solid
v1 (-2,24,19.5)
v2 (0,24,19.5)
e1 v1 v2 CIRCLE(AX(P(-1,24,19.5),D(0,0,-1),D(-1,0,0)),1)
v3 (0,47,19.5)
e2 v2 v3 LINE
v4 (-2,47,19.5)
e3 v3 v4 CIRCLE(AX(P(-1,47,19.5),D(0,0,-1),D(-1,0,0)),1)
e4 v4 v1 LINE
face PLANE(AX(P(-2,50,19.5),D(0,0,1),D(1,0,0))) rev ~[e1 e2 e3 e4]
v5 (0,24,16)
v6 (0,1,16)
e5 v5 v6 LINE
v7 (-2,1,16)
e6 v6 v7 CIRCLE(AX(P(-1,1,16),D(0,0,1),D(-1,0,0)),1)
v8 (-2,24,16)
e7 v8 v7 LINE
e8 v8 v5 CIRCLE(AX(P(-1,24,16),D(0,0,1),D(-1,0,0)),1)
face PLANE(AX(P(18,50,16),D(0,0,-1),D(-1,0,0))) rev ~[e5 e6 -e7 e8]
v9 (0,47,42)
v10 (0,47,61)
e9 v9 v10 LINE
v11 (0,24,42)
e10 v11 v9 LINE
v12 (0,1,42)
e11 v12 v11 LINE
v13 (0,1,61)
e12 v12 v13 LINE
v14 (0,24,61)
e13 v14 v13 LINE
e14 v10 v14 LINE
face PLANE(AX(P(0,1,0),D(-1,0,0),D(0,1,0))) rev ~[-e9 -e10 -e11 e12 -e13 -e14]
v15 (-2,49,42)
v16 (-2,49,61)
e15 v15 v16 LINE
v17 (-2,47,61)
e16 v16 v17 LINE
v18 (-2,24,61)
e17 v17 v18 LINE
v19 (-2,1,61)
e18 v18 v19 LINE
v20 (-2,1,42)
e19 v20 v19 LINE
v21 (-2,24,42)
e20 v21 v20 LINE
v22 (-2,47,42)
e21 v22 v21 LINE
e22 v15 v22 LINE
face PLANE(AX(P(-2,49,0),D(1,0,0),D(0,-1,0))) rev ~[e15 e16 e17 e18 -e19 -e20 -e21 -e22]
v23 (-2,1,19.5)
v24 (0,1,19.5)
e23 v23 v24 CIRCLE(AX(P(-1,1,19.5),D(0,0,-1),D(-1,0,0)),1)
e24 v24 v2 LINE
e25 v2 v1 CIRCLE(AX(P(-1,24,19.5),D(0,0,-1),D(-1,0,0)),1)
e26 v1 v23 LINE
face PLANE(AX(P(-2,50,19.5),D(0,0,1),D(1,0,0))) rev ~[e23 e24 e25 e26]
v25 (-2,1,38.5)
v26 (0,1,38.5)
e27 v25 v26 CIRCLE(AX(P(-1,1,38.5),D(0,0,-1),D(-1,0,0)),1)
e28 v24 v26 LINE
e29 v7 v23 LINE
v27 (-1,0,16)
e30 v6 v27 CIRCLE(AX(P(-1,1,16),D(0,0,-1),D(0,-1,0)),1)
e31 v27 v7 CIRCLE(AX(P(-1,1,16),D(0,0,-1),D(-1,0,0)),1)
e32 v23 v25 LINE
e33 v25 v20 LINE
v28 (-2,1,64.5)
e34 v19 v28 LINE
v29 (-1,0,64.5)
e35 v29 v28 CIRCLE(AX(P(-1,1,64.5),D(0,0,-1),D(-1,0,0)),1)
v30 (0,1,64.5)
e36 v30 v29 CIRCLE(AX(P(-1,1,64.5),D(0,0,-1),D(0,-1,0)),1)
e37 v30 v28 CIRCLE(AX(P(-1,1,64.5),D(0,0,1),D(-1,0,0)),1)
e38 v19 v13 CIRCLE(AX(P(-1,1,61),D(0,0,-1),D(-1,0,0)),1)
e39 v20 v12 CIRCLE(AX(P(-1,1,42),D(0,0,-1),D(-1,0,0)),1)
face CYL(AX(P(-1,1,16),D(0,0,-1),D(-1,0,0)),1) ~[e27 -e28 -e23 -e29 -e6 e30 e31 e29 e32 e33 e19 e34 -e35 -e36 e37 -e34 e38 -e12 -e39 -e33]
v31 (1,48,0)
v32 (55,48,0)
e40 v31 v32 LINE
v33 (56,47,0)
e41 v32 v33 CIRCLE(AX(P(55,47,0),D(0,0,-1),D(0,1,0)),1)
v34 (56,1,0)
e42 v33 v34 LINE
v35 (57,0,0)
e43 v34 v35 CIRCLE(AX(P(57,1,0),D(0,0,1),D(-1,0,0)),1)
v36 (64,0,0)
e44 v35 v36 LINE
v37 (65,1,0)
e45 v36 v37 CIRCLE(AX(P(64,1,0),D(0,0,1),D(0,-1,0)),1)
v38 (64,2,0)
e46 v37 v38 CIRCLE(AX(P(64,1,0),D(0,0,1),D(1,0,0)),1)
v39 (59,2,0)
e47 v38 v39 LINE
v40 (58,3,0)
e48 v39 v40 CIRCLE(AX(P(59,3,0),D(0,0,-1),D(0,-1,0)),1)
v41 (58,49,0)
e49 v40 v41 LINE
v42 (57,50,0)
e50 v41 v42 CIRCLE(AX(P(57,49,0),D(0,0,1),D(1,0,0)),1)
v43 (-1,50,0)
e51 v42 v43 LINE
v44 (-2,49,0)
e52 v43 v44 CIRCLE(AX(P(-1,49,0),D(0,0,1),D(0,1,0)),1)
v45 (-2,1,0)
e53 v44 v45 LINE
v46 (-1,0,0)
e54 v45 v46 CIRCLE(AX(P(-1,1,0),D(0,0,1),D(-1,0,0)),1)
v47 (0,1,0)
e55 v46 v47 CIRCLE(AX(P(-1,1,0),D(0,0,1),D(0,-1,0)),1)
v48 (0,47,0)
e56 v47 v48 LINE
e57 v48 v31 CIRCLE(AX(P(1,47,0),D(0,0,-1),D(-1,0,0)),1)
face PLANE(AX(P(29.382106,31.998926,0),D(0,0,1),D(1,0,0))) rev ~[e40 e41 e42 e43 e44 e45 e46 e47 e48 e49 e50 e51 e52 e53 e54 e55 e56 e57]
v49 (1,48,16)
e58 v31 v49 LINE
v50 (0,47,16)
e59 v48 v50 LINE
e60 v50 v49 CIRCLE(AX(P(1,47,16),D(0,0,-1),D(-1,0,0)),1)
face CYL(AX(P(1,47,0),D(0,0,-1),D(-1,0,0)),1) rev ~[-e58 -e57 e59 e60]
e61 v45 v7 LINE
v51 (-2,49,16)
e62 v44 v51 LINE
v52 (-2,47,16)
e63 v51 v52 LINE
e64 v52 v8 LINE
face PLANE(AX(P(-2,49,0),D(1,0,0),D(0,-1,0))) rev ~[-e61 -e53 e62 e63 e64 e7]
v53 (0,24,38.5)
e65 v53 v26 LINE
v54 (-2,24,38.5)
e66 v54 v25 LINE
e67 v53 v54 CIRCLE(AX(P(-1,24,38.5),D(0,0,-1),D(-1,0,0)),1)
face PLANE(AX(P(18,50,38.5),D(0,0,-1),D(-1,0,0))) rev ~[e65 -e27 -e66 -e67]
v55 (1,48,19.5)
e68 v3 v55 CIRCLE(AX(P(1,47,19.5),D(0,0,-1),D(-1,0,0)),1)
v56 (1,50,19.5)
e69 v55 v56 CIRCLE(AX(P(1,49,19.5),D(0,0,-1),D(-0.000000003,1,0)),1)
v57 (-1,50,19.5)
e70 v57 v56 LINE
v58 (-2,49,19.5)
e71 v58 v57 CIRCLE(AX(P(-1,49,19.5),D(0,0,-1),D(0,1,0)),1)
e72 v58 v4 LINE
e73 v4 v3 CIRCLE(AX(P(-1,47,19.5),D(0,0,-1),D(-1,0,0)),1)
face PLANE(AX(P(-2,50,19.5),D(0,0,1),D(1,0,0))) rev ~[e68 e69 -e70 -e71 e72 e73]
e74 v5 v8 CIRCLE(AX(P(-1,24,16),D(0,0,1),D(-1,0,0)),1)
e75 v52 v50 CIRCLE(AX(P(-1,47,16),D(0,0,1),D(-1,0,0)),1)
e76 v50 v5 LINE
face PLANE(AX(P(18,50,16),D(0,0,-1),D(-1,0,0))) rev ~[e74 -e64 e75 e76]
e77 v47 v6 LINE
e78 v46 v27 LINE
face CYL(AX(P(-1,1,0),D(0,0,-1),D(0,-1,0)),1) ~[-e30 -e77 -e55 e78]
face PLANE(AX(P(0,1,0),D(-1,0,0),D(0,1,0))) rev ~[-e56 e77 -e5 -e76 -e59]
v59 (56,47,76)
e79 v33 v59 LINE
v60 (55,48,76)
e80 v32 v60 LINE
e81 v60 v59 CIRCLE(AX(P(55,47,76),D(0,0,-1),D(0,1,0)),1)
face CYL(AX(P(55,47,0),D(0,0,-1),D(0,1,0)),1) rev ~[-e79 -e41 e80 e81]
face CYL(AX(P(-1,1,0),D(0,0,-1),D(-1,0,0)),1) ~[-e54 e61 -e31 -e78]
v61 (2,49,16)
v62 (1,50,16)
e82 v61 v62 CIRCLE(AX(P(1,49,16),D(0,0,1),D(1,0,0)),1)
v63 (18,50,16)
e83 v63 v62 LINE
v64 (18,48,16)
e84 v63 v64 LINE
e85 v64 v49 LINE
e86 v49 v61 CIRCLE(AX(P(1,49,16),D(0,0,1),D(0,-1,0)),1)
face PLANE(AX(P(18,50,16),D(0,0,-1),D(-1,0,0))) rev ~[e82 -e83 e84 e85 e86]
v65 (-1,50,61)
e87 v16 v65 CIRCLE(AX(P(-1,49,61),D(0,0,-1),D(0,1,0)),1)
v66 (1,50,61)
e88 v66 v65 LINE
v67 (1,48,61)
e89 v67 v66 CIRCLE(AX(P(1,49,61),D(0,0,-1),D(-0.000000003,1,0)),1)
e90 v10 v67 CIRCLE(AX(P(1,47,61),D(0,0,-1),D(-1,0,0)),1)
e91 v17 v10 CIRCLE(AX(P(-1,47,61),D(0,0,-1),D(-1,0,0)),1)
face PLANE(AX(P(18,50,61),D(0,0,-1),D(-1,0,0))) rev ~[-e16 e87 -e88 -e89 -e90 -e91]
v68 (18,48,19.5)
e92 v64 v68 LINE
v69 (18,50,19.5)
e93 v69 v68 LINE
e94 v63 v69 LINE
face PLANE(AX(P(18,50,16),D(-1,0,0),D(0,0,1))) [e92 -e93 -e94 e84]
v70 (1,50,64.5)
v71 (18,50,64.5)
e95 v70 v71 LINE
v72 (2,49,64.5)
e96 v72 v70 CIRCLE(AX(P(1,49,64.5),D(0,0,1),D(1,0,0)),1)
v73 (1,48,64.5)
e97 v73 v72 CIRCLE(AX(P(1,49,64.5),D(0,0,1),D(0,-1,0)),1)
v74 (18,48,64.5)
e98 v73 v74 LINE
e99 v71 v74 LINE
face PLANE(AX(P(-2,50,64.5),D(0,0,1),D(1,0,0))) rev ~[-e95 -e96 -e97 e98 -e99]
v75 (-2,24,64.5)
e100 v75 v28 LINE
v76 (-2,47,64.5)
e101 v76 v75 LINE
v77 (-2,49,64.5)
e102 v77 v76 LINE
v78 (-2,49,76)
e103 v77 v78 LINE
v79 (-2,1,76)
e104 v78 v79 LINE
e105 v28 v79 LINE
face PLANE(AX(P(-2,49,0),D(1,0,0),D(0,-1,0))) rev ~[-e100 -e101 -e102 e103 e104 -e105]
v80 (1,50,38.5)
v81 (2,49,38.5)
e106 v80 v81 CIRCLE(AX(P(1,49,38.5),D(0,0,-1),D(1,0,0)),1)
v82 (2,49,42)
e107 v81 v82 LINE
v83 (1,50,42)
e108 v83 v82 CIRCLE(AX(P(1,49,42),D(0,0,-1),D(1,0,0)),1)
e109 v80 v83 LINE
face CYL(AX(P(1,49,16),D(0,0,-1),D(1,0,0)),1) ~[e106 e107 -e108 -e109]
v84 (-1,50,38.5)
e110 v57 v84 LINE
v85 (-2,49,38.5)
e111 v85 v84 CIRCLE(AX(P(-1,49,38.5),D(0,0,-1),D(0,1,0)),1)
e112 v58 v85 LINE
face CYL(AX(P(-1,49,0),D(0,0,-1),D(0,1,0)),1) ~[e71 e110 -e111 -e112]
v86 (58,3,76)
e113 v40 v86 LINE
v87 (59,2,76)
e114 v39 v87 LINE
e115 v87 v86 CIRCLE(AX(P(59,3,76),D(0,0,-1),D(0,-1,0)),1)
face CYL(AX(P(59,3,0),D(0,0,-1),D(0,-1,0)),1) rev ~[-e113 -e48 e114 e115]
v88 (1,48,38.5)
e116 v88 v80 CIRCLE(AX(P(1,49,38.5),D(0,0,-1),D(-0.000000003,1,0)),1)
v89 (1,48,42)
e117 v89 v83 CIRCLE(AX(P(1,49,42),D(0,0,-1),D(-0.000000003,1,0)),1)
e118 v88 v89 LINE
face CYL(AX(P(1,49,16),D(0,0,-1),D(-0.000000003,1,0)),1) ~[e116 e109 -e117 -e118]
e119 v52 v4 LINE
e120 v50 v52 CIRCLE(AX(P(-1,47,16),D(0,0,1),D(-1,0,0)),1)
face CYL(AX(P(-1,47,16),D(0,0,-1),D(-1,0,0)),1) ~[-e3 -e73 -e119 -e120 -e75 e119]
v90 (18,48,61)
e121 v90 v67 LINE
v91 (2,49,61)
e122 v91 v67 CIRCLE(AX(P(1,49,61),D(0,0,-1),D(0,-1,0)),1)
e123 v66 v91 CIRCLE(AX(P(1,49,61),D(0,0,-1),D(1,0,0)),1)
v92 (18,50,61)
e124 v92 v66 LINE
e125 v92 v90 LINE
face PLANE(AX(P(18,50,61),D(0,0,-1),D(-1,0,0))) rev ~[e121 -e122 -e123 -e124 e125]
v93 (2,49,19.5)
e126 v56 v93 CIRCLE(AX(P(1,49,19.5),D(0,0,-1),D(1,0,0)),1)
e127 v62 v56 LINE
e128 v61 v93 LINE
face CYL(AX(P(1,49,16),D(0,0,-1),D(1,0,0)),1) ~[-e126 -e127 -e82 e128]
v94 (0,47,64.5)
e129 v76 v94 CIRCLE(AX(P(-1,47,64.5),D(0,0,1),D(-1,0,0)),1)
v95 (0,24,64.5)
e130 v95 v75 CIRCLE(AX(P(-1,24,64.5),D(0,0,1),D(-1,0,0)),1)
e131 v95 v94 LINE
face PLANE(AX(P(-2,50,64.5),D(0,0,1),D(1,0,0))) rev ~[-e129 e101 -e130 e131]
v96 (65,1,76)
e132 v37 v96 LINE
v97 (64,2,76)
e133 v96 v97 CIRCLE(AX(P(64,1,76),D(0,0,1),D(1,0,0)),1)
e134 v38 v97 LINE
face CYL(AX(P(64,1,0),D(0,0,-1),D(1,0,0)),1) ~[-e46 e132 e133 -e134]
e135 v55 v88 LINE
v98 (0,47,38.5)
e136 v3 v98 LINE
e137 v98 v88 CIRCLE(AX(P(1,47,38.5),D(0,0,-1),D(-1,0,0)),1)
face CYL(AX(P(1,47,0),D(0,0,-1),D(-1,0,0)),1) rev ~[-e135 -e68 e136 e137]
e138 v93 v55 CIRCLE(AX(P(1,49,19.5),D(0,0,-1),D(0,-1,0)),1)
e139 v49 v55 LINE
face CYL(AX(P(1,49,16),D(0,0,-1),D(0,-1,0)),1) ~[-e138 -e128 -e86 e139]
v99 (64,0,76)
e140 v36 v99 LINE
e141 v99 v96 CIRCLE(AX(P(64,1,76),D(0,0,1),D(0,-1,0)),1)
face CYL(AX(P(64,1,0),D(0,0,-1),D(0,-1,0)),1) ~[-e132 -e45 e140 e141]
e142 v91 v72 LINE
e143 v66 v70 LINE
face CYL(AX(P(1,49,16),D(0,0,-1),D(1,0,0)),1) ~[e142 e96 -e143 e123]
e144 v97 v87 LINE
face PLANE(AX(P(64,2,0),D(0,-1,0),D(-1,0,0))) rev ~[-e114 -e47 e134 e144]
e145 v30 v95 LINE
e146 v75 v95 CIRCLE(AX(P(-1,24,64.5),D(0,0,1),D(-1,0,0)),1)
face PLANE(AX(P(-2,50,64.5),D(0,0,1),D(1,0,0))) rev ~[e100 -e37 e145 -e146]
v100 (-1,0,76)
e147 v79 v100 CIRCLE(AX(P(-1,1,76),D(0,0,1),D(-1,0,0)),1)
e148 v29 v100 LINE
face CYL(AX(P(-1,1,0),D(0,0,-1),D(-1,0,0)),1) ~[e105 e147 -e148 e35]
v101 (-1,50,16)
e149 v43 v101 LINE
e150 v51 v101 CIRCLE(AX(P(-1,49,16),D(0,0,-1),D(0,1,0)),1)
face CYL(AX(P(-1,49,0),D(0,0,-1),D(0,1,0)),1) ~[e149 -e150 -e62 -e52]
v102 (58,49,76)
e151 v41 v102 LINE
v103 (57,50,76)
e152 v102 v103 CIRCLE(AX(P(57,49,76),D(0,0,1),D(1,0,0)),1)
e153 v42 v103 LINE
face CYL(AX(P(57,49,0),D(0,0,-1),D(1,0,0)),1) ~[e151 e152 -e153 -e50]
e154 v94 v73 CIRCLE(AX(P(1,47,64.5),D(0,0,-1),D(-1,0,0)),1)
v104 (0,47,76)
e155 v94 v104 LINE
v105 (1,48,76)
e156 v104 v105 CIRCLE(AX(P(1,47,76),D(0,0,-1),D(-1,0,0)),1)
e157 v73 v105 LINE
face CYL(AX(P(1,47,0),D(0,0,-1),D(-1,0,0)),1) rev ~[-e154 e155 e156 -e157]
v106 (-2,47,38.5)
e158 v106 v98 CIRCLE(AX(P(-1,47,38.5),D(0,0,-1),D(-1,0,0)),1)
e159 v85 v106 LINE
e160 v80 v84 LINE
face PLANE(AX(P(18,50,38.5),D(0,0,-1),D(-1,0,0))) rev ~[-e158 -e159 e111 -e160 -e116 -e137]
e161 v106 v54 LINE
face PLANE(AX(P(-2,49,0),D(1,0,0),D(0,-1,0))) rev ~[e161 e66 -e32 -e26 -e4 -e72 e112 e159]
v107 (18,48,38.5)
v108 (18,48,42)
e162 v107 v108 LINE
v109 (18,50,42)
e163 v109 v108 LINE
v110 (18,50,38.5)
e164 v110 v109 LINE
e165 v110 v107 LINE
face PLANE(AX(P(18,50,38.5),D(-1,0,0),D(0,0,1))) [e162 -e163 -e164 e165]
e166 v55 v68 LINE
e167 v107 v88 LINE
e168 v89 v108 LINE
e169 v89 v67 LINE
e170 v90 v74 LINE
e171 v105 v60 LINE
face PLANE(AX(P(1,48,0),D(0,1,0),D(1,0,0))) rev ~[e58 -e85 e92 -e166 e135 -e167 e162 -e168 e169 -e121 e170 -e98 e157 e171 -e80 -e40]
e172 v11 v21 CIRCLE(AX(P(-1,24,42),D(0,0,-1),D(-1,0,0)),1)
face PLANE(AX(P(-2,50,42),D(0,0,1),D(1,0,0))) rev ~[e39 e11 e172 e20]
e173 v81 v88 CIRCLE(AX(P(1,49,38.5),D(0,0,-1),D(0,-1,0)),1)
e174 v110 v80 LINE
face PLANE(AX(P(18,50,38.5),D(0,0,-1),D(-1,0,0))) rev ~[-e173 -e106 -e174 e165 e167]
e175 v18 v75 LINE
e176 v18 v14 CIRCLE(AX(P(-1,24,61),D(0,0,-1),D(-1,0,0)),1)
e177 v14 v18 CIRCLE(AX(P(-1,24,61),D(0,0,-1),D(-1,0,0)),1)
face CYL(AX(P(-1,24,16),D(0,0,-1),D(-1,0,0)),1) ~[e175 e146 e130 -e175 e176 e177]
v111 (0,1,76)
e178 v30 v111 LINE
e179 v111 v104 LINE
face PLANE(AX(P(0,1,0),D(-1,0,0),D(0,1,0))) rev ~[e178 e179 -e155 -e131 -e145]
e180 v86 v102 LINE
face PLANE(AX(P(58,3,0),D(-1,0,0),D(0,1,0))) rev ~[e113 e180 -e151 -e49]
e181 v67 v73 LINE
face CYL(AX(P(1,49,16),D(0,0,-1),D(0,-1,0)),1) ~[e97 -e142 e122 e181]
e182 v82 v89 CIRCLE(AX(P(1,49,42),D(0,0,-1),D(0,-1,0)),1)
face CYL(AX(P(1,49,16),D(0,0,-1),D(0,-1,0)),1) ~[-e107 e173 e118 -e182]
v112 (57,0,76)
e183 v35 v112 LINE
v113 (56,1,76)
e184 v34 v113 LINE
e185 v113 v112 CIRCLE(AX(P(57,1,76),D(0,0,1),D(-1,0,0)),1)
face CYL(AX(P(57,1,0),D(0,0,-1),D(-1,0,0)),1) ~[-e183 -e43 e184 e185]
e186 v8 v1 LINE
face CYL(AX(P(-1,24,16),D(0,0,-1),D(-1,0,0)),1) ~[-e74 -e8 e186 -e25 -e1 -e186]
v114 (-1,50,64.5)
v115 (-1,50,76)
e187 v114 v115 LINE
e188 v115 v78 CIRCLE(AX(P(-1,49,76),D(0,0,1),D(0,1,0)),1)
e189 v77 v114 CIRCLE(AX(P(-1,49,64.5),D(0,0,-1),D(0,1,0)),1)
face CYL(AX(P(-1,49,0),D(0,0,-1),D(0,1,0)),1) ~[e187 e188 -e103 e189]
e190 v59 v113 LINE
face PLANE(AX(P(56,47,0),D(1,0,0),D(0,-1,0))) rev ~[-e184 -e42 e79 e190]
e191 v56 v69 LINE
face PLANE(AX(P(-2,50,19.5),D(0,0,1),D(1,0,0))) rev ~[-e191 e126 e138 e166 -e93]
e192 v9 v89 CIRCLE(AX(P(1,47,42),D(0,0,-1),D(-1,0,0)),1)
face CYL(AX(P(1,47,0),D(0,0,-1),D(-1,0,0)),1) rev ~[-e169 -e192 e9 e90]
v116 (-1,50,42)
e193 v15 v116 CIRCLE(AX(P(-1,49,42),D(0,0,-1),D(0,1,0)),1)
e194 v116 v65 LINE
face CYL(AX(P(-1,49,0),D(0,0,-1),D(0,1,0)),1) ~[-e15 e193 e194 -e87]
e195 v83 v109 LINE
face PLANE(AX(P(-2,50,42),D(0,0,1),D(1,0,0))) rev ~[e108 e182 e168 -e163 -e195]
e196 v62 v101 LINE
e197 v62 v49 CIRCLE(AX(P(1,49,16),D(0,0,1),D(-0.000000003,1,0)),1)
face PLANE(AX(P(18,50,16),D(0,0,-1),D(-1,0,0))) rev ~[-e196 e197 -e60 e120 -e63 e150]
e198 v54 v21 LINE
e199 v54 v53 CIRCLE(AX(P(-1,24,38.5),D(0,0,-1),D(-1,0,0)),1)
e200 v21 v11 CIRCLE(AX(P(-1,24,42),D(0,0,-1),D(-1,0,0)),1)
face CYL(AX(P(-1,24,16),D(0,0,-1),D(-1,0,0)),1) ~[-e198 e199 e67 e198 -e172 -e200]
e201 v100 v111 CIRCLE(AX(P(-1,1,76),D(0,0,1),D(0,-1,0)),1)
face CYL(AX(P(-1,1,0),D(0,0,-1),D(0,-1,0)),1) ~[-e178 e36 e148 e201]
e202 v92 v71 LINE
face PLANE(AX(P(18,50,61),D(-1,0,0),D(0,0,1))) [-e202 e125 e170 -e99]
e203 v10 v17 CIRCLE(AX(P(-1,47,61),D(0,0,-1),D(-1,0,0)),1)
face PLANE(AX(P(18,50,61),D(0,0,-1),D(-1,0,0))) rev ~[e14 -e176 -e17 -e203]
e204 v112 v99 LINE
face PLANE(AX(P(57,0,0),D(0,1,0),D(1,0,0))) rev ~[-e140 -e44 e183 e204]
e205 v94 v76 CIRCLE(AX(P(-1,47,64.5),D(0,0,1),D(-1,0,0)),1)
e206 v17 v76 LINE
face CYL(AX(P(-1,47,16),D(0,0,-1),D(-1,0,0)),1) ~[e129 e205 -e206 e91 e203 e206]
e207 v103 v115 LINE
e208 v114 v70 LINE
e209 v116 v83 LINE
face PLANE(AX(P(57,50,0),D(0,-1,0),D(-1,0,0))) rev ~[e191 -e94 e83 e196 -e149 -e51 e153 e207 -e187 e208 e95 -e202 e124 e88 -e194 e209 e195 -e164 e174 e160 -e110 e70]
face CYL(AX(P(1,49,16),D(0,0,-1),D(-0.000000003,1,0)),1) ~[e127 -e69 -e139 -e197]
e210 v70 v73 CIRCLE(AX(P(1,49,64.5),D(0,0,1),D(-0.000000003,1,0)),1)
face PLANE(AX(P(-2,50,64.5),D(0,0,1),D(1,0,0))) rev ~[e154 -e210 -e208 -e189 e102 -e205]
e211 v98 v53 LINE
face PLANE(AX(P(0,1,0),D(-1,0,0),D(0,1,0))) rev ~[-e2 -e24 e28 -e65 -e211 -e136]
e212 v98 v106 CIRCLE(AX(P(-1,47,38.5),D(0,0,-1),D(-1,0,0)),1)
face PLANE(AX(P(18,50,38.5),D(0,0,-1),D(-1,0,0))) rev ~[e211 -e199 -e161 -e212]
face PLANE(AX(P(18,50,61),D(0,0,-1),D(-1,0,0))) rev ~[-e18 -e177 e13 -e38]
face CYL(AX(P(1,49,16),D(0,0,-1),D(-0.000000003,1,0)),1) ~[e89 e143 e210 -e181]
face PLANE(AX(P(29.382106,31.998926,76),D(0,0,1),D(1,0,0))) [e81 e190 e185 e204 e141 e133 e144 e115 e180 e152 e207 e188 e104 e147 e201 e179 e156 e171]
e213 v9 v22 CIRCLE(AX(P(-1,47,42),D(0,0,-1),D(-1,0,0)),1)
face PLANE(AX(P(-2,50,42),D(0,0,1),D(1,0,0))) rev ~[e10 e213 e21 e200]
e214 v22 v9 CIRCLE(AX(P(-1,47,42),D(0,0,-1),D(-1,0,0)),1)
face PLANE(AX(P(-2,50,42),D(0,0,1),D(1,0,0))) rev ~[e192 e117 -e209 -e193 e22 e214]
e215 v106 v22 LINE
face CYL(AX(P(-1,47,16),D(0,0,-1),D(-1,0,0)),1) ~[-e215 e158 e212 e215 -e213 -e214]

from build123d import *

# Parameters (mm, degrees)
F1_DEPTH = 76
F2_W     = 1
F2_H     = 3.5
F2_W_2   = 19
F3_DEPTH = 50.001
F5_DEPTH = 48.5


# Not quite as in the source:
# - a feature names something its author has since deleted; it is built from what else it names


with BuildPart() as f1:
    # F0 (on Top) → F1 (new body)
    with BuildSketch(Plane.XY):
        with BuildLine():
            ThreePointArc((-1, 0), (-0.2928932188, 0.2928932188), (0, 1))
            Line((0, 1), (0, 47))
            ThreePointArc((0, 47), (0.2928932188, 47.7071067812), (1, 48))
            Line((1, 48), (55, 48))
            ThreePointArc((55, 48), (55.7071067812, 47.7071067812), (56, 47))
            Line((56, 47), (56, 1))
            ThreePointArc((56, 1), (56.2928932188, 0.2928932188), (57, 0))
            Line((57, 0), (64, 0))
            ThreePointArc((64, 0), (64.7071067812, 0.2928932188), (65, 1))
            ThreePointArc((65, 1), (64.7071067812, 1.7071067812), (64, 2))
            Line((64, 2), (59, 2))
            ThreePointArc((59, 2), (58.2928932188, 2.2928932188), (58, 3))
            Line((58, 3), (58, 49))
            ThreePointArc((58, 49), (57.7071067812, 49.7071067812), (57, 50))
            Line((57, 50), (-1, 50))
            ThreePointArc((-1, 50), (-1.7071067812, 49.7071067812), (-2, 49))
            Line((-2, 49), (-2, 1))
            ThreePointArc((-2, 1), (-1.7071067812, 0.2928932188), (-1, 0))
        make_face()
    extrude(amount=F1_DEPTH)

    # F2 (on face) → F3 (cut, through all)
    with BuildSketch(Plane(origin=(0, 50, 0), x_dir=(-1, 0, 0), z_dir=(0, 1, 0))):
        with Locations((1.5, 17.75)):
            Rectangle(F2_W, F2_H)
        with Locations((-8.5, 17.75)):
            Rectangle(F2_W_2, F2_H)
        with Locations((-8.5, 40.25)):
            Rectangle(F2_W_2, F2_H)
        with Locations((-8.5, 62.75)):
            Rectangle(F2_W_2, F2_H)
        with Locations((1.5, 40.25)):
            Rectangle(F2_W, F2_H)
        with Locations((1.5, 62.75)):
            Rectangle(F2_W, F2_H)
    extrude(amount=-F3_DEPTH, mode=Mode.SUBTRACT)

    # F4 (on face) → F5 (join, through all)
    with BuildSketch(Plane.XY.offset(16)):
        with BuildLine():
            ThreePointArc((0, 47), (-1, 48), (-2, 47))
            ThreePointArc((-2, 47), (-1, 46), (0, 47))
        make_face()
        with BuildLine():
            ThreePointArc((0, 24), (-1, 25), (-2, 24))
            ThreePointArc((-2, 24), (-1, 23), (0, 24))
        make_face()
        with BuildLine():
            ThreePointArc((0, 1), (-1, 2), (-2, 1))
            ThreePointArc((-2, 1), (-1, 0), (0, 1))
        make_face()
        with BuildLine():
            ThreePointArc((0.999999997, 50), (0, 48.9999999985), (1, 48))
            ThreePointArc((1, 48), (1.7071067812, 48.2928932188), (2, 49))
            ThreePointArc((2, 49), (1.7071067801, 49.7071067822), (0.999999997, 50))
        make_face()
    extrude(amount=F5_DEPTH)


solid = f1.part
